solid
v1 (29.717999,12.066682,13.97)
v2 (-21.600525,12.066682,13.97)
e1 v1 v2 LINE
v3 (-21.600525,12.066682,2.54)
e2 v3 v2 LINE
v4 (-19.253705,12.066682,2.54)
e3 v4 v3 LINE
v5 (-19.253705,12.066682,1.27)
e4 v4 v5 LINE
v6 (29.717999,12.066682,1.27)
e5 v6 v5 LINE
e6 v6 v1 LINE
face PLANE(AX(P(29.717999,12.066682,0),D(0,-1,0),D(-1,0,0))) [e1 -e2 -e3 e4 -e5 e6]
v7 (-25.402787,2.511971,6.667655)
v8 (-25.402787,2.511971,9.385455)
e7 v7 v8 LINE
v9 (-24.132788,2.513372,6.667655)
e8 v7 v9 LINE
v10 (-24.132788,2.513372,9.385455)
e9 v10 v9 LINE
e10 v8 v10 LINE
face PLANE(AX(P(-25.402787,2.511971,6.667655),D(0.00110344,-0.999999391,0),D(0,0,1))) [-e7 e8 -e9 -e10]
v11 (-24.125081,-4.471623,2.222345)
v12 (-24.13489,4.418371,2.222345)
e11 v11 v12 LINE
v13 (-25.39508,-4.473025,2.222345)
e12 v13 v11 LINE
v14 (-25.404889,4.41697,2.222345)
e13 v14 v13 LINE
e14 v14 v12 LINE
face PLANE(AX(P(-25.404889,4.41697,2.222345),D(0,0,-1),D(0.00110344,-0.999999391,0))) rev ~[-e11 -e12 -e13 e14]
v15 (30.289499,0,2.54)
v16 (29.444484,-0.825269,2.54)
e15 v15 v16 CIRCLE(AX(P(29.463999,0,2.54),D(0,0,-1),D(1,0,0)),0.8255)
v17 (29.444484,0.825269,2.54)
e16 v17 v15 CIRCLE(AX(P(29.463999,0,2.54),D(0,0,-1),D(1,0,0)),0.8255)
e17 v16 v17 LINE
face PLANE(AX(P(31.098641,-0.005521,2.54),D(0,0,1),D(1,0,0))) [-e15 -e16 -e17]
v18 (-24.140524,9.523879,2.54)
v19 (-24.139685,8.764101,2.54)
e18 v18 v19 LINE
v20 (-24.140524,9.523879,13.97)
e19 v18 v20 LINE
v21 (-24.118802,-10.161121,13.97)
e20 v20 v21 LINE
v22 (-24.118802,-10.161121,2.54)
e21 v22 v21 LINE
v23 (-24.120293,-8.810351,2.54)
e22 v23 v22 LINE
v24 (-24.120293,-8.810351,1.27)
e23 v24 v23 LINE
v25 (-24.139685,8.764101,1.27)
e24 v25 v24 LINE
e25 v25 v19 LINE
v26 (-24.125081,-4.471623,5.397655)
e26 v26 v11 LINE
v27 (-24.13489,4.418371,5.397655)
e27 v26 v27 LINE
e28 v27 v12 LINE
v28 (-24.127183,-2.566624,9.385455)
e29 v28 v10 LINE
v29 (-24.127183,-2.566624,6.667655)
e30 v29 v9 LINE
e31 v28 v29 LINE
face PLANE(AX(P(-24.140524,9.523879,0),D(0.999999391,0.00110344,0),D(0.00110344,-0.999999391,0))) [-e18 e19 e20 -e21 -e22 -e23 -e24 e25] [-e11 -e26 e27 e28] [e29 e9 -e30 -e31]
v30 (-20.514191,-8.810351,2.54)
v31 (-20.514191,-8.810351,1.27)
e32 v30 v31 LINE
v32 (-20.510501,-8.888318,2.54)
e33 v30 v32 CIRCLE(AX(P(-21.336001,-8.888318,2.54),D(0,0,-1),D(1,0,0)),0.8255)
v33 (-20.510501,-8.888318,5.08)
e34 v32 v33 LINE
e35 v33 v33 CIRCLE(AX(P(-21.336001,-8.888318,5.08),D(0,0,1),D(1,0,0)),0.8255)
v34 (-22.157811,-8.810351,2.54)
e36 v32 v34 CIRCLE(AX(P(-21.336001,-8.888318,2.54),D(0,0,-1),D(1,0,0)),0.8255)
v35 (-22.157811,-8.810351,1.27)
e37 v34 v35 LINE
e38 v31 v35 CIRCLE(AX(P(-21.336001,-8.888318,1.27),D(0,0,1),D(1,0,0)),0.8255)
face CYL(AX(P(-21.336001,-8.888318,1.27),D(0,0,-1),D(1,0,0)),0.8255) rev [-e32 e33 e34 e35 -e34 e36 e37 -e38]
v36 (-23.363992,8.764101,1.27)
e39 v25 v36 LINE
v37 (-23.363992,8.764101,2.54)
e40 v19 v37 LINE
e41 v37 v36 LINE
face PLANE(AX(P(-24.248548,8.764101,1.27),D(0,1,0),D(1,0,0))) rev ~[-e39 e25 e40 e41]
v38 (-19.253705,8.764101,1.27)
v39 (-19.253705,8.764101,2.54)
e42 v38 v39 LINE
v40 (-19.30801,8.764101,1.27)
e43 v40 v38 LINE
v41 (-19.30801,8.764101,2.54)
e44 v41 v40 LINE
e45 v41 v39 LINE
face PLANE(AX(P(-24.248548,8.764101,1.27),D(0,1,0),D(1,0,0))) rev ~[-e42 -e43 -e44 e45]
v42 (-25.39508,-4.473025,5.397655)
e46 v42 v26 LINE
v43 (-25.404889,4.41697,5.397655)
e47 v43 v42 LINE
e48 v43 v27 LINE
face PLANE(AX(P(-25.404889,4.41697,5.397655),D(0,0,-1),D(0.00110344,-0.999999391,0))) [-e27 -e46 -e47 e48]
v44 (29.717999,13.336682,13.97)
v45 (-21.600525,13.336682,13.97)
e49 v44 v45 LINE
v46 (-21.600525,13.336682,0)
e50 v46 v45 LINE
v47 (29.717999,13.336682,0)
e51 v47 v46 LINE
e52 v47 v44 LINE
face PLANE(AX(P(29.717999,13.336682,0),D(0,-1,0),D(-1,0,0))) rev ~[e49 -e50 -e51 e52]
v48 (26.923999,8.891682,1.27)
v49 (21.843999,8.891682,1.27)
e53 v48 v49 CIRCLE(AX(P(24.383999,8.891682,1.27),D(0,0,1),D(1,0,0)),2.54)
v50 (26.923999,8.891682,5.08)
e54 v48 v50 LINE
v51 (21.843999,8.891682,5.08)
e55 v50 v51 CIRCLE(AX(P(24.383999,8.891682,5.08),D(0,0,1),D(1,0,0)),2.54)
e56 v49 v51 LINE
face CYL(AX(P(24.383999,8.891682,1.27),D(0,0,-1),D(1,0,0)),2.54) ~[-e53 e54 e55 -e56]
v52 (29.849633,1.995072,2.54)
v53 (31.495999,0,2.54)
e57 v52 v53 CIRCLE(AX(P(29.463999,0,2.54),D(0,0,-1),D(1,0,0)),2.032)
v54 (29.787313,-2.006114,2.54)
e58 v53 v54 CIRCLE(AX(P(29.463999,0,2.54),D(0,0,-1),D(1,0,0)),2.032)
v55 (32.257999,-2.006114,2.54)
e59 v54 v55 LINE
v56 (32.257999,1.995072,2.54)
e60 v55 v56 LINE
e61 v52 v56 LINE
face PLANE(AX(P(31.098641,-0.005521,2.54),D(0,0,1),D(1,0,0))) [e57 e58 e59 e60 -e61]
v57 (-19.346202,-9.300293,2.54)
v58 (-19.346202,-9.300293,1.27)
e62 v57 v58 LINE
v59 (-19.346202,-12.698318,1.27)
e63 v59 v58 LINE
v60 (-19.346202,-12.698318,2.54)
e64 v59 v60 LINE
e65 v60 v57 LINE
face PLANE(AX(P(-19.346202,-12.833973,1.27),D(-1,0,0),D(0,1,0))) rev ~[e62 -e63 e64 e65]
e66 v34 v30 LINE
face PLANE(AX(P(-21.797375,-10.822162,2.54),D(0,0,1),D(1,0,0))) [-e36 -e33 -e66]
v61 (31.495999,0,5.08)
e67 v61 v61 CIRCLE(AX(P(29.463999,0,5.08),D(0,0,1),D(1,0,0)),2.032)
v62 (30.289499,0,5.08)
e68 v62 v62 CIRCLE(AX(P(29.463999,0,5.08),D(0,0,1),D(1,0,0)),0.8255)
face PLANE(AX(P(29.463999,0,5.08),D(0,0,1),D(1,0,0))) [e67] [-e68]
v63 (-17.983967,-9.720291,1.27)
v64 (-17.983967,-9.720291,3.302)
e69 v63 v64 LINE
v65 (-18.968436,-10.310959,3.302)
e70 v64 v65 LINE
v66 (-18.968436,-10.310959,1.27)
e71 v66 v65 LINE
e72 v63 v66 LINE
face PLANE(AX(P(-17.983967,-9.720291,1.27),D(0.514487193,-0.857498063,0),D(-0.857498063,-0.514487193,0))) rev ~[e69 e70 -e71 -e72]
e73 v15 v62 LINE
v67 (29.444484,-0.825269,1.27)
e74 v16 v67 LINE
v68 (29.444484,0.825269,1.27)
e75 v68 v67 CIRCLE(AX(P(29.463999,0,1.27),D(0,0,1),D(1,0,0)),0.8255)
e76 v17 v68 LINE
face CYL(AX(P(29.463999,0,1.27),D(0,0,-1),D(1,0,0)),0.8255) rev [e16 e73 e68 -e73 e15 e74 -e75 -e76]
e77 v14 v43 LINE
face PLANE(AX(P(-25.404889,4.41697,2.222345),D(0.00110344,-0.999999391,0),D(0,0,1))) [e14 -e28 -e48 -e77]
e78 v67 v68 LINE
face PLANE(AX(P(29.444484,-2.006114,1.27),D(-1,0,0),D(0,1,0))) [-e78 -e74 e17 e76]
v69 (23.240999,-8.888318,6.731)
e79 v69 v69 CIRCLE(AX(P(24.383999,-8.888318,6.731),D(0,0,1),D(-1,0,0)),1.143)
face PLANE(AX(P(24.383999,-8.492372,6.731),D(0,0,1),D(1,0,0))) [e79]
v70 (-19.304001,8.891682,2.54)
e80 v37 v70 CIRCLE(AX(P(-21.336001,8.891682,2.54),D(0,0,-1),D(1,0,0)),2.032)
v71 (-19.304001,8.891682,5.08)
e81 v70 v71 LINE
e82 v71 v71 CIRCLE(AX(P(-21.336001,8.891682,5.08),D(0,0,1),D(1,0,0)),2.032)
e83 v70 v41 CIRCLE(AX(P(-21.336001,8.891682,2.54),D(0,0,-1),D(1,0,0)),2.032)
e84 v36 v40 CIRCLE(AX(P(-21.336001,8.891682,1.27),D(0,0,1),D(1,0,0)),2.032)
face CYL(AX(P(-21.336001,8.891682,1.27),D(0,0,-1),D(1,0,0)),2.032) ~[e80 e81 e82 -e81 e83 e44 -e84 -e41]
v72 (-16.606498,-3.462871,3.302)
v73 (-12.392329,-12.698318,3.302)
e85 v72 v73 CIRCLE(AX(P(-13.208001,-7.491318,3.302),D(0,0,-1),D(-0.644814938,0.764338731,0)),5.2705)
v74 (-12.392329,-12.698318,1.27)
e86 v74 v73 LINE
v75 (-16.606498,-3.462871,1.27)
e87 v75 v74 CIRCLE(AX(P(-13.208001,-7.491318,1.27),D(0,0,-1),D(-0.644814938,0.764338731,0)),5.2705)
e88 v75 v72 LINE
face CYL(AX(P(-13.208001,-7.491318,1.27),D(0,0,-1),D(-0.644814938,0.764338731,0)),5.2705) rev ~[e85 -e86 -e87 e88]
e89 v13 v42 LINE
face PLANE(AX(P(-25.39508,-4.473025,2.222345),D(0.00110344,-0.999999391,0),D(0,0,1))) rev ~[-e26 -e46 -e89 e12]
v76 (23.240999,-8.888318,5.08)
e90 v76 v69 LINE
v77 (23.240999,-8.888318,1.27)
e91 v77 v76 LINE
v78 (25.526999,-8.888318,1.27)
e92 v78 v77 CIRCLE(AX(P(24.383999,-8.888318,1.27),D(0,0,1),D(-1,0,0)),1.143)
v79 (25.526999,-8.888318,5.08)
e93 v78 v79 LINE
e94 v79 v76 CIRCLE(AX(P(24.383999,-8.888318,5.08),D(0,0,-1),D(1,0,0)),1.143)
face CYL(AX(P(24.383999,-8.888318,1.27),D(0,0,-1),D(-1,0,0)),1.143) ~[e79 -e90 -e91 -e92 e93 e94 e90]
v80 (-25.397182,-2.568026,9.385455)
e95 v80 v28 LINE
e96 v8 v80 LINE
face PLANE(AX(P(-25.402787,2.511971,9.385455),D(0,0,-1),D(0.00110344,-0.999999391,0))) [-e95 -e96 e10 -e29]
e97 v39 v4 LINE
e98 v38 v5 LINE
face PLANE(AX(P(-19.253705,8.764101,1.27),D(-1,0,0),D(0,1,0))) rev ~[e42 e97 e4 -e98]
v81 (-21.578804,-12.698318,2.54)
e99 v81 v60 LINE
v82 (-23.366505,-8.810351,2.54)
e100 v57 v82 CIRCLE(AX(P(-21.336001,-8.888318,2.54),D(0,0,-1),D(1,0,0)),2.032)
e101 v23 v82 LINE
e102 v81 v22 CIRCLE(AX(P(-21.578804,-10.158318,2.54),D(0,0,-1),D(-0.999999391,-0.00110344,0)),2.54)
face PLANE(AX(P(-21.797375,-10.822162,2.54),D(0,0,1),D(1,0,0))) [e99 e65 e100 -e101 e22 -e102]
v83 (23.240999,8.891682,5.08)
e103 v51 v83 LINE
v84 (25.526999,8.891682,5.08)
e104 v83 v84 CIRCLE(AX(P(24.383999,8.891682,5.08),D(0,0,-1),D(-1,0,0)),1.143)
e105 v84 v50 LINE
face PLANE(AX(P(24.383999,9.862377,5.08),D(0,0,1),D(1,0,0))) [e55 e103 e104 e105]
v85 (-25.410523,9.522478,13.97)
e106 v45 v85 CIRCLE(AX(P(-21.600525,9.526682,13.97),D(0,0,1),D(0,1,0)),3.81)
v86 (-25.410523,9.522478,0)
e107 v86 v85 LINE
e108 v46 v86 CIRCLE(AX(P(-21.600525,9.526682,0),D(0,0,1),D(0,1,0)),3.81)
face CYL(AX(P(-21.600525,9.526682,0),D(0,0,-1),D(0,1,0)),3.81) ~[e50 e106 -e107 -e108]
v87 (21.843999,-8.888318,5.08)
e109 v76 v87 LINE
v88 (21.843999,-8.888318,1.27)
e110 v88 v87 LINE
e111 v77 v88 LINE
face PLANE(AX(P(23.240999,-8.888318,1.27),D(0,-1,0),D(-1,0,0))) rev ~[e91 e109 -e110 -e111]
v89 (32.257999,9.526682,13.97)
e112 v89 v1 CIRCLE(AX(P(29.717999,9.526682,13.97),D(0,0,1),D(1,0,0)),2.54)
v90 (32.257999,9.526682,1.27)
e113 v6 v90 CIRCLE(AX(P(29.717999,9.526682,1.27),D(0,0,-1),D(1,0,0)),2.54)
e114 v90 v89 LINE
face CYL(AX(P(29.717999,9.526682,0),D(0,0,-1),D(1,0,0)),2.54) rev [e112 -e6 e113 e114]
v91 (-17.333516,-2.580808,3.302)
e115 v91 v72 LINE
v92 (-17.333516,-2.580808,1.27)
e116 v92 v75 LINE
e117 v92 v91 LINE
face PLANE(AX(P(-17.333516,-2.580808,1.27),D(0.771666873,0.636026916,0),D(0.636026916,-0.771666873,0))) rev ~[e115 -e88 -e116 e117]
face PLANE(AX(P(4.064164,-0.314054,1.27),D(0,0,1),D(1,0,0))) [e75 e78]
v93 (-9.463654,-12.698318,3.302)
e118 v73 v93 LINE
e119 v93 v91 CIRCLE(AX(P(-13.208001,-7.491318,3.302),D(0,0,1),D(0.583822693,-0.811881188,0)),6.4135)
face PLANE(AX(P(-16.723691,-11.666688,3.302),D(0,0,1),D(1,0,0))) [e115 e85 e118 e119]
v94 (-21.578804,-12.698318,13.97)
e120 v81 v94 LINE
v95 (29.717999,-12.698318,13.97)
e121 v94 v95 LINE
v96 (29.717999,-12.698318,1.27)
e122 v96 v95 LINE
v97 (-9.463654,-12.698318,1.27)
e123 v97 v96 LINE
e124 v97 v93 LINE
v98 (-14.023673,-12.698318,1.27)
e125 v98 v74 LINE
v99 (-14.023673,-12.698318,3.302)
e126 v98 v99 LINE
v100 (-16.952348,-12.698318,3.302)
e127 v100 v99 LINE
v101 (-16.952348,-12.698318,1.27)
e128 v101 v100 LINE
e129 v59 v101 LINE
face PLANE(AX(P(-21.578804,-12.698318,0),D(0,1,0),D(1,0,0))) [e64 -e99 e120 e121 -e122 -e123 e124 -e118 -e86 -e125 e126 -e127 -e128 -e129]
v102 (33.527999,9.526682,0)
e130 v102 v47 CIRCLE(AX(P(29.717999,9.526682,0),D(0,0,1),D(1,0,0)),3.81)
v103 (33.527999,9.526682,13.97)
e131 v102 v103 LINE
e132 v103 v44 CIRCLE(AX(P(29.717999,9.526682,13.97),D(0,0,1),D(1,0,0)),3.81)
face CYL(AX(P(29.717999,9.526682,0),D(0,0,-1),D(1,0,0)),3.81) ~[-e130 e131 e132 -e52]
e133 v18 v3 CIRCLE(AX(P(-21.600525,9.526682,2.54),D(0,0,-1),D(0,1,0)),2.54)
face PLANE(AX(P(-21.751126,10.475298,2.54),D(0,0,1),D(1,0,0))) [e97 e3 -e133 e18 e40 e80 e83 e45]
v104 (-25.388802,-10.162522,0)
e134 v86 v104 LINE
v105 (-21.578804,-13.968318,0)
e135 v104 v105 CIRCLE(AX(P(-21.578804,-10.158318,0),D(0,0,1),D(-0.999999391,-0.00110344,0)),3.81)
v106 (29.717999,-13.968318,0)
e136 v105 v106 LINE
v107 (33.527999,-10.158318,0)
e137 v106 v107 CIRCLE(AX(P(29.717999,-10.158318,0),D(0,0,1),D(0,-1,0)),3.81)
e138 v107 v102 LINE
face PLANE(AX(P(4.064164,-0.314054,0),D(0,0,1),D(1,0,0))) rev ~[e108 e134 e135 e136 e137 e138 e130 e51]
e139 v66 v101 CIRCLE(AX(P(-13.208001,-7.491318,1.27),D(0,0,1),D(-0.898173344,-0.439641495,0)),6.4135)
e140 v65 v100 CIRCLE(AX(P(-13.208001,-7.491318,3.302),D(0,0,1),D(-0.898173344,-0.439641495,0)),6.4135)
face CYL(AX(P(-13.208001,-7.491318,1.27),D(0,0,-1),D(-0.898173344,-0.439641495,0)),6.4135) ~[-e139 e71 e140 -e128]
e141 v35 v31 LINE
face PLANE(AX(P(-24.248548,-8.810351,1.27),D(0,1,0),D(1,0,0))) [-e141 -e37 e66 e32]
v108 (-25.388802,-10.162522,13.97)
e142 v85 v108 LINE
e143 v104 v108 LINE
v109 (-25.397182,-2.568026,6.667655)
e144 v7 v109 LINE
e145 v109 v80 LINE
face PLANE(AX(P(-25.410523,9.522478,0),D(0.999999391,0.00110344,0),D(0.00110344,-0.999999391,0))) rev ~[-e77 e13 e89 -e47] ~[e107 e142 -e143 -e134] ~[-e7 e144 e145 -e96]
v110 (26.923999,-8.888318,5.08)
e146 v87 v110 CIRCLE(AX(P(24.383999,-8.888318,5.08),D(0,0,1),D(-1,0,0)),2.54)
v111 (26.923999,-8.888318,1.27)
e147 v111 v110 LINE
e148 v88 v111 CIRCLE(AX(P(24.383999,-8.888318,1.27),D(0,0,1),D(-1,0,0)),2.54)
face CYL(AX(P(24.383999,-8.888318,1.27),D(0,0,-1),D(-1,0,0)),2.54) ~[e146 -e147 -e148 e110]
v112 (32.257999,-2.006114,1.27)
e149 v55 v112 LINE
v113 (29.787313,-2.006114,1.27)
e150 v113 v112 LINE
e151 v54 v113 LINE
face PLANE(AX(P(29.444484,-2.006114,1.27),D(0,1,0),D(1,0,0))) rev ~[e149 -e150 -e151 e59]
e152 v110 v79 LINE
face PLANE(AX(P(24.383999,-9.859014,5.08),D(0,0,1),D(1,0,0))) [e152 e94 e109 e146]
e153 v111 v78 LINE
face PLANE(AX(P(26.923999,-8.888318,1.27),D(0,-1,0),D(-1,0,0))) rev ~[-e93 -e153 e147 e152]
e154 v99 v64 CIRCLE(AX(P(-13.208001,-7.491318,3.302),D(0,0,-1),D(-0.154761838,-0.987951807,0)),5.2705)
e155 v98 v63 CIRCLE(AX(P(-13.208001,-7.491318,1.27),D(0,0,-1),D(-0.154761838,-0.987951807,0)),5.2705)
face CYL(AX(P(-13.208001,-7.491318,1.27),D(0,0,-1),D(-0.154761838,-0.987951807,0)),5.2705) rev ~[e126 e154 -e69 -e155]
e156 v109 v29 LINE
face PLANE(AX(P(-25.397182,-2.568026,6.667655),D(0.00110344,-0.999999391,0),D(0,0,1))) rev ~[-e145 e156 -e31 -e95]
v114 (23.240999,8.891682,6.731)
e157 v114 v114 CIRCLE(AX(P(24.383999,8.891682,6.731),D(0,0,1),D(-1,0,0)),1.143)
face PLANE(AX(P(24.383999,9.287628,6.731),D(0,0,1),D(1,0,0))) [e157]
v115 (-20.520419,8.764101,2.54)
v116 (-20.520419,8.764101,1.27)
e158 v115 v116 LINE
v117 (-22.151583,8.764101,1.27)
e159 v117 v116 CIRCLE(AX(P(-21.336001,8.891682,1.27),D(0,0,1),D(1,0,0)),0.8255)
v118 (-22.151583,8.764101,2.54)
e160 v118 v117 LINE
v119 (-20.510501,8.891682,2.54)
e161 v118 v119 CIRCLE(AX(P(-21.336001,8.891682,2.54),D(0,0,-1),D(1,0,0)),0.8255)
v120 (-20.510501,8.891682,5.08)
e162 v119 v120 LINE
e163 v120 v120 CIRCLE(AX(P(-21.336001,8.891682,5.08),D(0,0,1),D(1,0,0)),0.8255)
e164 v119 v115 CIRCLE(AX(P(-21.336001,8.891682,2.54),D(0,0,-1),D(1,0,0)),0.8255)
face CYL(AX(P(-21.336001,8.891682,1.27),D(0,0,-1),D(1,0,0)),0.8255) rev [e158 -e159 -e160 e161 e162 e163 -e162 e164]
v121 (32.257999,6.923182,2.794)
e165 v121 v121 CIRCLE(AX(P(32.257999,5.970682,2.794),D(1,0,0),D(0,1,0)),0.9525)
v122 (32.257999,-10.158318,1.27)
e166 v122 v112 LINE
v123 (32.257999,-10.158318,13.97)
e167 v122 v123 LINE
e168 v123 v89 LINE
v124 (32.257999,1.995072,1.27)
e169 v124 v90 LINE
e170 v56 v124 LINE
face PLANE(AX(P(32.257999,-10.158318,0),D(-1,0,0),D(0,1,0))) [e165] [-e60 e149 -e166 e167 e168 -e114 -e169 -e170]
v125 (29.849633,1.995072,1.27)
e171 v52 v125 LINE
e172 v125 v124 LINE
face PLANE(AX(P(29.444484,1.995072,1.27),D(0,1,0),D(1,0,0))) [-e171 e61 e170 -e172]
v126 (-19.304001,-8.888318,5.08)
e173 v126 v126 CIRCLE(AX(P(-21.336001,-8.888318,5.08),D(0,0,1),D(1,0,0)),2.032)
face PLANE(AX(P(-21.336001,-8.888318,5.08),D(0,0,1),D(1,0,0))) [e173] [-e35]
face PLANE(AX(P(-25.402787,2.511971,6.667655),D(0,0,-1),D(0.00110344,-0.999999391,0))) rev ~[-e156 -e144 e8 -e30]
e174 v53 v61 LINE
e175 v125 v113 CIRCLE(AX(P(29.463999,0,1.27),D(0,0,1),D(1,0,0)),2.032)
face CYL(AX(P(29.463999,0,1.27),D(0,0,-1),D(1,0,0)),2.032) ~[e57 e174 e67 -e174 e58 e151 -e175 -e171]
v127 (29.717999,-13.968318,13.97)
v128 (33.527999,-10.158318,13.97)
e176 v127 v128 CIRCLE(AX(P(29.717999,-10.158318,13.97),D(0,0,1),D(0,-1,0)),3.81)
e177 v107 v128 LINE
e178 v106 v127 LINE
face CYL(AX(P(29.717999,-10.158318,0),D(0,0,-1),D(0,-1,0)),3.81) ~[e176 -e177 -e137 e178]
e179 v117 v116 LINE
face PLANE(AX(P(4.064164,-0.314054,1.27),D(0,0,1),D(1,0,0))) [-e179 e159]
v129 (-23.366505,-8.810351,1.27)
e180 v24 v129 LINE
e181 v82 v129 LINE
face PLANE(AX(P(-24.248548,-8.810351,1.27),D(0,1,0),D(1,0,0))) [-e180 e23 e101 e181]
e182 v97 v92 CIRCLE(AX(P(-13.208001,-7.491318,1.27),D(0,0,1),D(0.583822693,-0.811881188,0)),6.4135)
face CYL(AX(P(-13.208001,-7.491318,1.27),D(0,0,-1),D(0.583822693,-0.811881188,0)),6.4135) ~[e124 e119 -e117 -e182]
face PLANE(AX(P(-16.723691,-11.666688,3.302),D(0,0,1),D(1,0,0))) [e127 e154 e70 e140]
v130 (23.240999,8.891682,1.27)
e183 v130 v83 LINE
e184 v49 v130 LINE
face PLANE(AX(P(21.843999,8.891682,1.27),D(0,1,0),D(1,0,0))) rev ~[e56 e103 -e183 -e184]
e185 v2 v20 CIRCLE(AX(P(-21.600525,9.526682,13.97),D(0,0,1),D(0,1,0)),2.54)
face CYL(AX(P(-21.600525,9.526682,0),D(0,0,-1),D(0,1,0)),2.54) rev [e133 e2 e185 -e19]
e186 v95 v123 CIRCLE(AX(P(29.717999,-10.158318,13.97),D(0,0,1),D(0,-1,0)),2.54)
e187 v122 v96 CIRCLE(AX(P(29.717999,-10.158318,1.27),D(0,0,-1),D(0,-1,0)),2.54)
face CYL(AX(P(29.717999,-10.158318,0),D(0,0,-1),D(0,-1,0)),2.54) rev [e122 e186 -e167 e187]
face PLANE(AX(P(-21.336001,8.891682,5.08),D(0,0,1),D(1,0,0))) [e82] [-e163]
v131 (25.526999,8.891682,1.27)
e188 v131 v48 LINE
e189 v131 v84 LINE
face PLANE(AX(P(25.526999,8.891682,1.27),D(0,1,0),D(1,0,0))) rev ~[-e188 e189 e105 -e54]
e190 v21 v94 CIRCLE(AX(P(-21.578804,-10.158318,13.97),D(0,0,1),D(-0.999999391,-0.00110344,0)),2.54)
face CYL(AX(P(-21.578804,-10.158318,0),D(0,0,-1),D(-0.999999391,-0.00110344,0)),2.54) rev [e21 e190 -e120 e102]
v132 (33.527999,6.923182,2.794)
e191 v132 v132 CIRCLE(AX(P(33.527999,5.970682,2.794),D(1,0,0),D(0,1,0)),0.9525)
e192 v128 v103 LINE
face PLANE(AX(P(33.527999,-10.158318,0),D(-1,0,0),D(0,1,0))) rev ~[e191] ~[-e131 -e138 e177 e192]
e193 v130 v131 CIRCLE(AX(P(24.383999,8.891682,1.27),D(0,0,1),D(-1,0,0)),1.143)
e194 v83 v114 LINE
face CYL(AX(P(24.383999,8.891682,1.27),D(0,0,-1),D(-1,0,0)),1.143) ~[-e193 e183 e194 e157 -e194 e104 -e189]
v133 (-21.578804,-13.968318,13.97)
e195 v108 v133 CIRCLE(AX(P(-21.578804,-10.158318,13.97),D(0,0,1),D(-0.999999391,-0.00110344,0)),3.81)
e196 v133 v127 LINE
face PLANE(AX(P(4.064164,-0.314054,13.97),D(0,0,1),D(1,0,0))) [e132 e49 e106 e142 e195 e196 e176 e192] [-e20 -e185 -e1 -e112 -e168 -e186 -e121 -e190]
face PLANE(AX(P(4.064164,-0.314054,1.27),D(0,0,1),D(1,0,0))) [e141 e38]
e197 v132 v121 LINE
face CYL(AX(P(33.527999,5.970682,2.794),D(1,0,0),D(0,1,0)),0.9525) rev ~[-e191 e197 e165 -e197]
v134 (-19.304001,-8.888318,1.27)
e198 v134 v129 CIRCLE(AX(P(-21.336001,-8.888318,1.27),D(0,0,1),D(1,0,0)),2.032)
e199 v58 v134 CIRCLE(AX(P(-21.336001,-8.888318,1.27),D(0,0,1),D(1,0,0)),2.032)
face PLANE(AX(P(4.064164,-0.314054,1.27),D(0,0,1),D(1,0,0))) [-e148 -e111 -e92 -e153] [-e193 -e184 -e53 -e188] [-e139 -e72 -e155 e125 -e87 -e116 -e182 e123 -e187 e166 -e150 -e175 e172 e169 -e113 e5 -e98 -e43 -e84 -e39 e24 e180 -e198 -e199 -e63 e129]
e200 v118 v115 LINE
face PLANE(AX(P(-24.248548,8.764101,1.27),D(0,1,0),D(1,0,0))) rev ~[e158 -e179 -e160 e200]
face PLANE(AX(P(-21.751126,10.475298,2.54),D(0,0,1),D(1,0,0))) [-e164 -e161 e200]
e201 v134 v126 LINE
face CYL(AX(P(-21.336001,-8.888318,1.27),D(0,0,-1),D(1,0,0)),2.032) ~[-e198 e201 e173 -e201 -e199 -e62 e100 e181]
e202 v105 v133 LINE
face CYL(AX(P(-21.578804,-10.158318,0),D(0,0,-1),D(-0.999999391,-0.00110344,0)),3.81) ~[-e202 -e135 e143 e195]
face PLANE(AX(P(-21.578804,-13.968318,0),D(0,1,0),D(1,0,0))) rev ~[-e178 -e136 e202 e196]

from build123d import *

# Parameters (mm, degrees)
F1_DEPTH  = 13.97
F2_T      = -1.27
F3_R      = 2.032
F3_R_2    = 0.8255
F4_DEPTH  = 3.81
F5_DEPTH  = 5.461
F6_DEPTH  = 2.54
F7_W      = 8.89
F7_H      = 3.1753103511
F7_W_2    = 5.08
F7_H_2    = 2.7178
F8_DEPTH  = 1.905
F9_R      = 0.9525
F10_DEPTH = 1.905
F11_R     = 2.032
F11_R_2   = 0.8255
F12_DEPTH = 3.81
F14_DEPTH = 2.032
F15_W     = 3.3083129674
F15_H     = 4.001185298
F15_W_2   = 4.9948431551
F15_H_2   = 3.4223934636
F15_W_3   = 4.9023460597
F15_H_3   = 4.0236227214
F16_DEPTH = 1.27


with BuildPart() as f1:
    # F0 (on Top) → F1 (new body)
    with BuildSketch(Plane.XY):
        with BuildLine():
            Line((-21.5788040441, -13.9683183577), (29.7179990722, -13.9683183577))
            ThreePointArc((29.7179990722, -13.9683183577), (32.4120759085, -12.852395194), (33.5279990722, -10.1583183577))
            Line((33.5279990722, -10.1583183577), (33.5279990722, 9.5266816423))
            ThreePointArc((33.5279990722, 9.5266816423), (32.4120759085, 12.2207584786), (29.7179990722, 13.3366816423))
            Line((29.7179990722, 13.3366816423), (-21.60052527, 13.3366816423))
            ThreePointArc((-21.60052527, 13.3366816423), (-24.2960880723, 12.2192716925), (-25.4105229505, 9.5224775366))
            Line((-25.4105229505, 9.5224775366), (-25.3888017246, -10.1625224634))
            ThreePointArc((-25.3888017246, -10.1625224634), (-24.2713940943, -12.8538811601), (-21.5788040441, -13.9683183577))
        make_face()
    extrude(amount=F1_DEPTH)

    # F2
    f2_openings = [f1.faces().sort_by_distance(p)[0] for p in [
        (4.064166, -0.31477, 13.97),
    ]]
    offset(amount=F2_T, openings=f2_openings)

    # F3 (on face) → F4 (join)
    with BuildSketch(Plane.XY.offset(1.27)):
        with Locations((-21.3360009278, 8.8916816423)):
            Circle(F3_R)
        with Locations((-21.3360009278, 8.8916816423)):
            Circle(F3_R_2, mode=Mode.SUBTRACT)
        with Locations((-21.3360009278, -8.8883183577)):
            Circle(F3_R)
        with Locations((-21.3360009278, -8.8883183577)):
            Circle(F3_R_2, mode=Mode.SUBTRACT)
        with BuildLine():
            Line((26.9239990722, -8.8883183577), (25.5269990722, -8.8883183577))
            ThreePointArc((25.5269990722, -8.8883183577), (24.3839990722, -10.0313183577), (23.2409990722, -8.8883183577))
            Line((23.2409990722, -8.8883183577), (21.8439990722, -8.8883183577))
            ThreePointArc((21.8439990722, -8.8883183577), (24.3839990722, -11.4283183577), (26.9239990722, -8.8883183577))
        make_face()
        with BuildLine():
            ThreePointArc((23.2409990722, 8.8916816423), (24.3839990722, 10.0346816423), (25.5269990722, 8.8916816423))
            Line((25.5269990722, 8.8916816423), (26.9239990722, 8.8916816423))
            ThreePointArc((26.9239990722, 8.8916816423), (24.3839990722, 11.4316816423), (21.8439990722, 8.8916816423))
            Line((21.8439990722, 8.8916816423), (23.2409990722, 8.8916816423))
        make_face()
    extrude(amount=F4_DEPTH)

    # F3 (on face) → F5 (join)
    with BuildSketch(Plane.XY.offset(1.27)):
        with BuildLine():
            Line((24.3839990722, 8.8916816423), (25.5269990722, 8.8916816423))
            ThreePointArc((25.5269990722, 8.8916816423), (24.3839990722, 10.0346816423), (23.2409990722, 8.8916816423))
            Line((23.2409990722, 8.8916816423), (24.3839990722, 8.8916816423))
        make_face()
        with BuildLine():
            ThreePointArc((23.2409990722, 8.8916816423), (24.3839990722, 7.7486816423), (25.5269990722, 8.8916816423))
            Line((25.5269990722, 8.8916816423), (24.3839990722, 8.8916816423))
            Line((24.3839990722, 8.8916816423), (23.2409990722, 8.8916816423))
        make_face()
        with BuildLine():
            Line((24.3839990722, -8.8883183577), (25.5269990722, -8.8883183577))
            ThreePointArc((25.5269990722, -8.8883183577), (24.3839990722, -7.7453183577), (23.2409990722, -8.8883183577))
            Line((23.2409990722, -8.8883183577), (24.3839990722, -8.8883183577))
        make_face()
        with BuildLine():
            ThreePointArc((23.2409990722, -8.8883183577), (24.3839990722, -10.0313183577), (25.5269990722, -8.8883183577))
            Line((25.5269990722, -8.8883183577), (24.3839990722, -8.8883183577))
            Line((24.3839990722, -8.8883183577), (23.2409990722, -8.8883183577))
        make_face()
    extrude(amount=F5_DEPTH)

    # F3 (on face) → F6 (cut)
    with BuildSketch(Plane.XY.offset(1.27)):
        with Locations((-21.3360009278, 8.8916816423)):
            Circle(F3_R_2)
        with Locations((-21.3360009278, -8.8883183577)):
            Circle(F3_R_2)
    extrude(amount=F6_DEPTH, mode=Mode.SUBTRACT)

    # F7 (on face) → F8 (cut)
    with BuildSketch(Plane(origin=(-25.3999845367, -0.0280273712, 0), x_dir=(0.0011034398, -0.9999993912, 0), z_dir=(-0.9999993912, -0.0011034398, 0))):
        with Locations((0, 3.81)):
            Rectangle(F7_W, F7_H)
        with Locations((0, 8.0265551756)):
            Rectangle(F7_W_2, F7_H_2)
    extrude(amount=-F8_DEPTH, mode=Mode.SUBTRACT)

    # F9 (on face) → F10 (cut)
    with BuildSketch(Plane.YZ.offset(33.5279990722)):
        with Locations((5.9706816423, 2.794)):
            Circle(F9_R)
    extrude(amount=-F10_DEPTH, mode=Mode.SUBTRACT)

    # F11 (on face) → F12 (join)
    with BuildSketch(Plane.XY.offset(1.27)):
        with Locations((29.4639990722, 0)):
            Circle(F11_R)
        with Locations((29.4639990722, 0)):
            Circle(F11_R_2, mode=Mode.SUBTRACT)
    extrude(amount=F12_DEPTH)

    # F13 (on face) → F14 (join)
    with BuildSketch(Plane.XY.offset(1.27)):
        with BuildLine():
            ThreePointArc((-14.0236731965, -12.6983183577), (-16.3756129487, -11.7037291087), (-17.9839668508, -9.7202911598))
            Line((-17.9839668508, -9.7202911598), (-18.9684356708, -10.3109590834))
            ThreePointArc((-18.9684356708, -10.3109590834), (-18.1080100407, -11.6293001054), (-16.9523477667, -12.6983183577))
            Line((-16.9523477667, -12.6983183577), (-14.0236731965, -12.6983183577))
        make_face()
        with BuildLine():
            ThreePointArc((-12.3923286591, -12.6983183577), (-13.2080009278, -12.7618183577), (-14.0236731965, -12.6983183577))
            Line((-14.0236731965, -12.6983183577), (-16.9523477667, -12.6983183577))
            ThreePointArc((-16.9523477667, -12.6983183577), (-13.2080009278, -13.9048183577), (-9.4636540889, -12.6983183577))
            Line((-9.4636540889, -12.6983183577), (-12.3923286591, -12.6983183577))
        make_face()
        with BuildLine():
            ThreePointArc((-16.6064980594, -3.4628710766), (-8.4130955389, -5.303384958), (-12.3923286591, -12.6983183577))
            Line((-12.3923286591, -12.6983183577), (-9.4636540889, -12.6983183577))
            ThreePointArc((-9.4636540889, -12.6983183577), (-8.145657173, -3.5535959249), (-17.3335159362, -2.5808083877))
            Line((-17.3335159362, -2.5808083877), (-16.6064980594, -3.4628710766))
        make_face()
    extrude(amount=F14_DEPTH)

    # F15 (on face) → F16 (join)
    with BuildSketch(Plane.XY.offset(1.27)):
        with Locations((31.0986405239, -0.0055211131)):
            Rectangle(F15_W, F15_H)
        with Locations((-21.7511262745, 10.4752979241)):
            Rectangle(F15_W_2, F15_H_2)
        with Locations((-21.7973748222, -10.8221620321)):
            Rectangle(F15_W_3, F15_H_3)
    extrude(amount=F16_DEPTH)


solid = f1.part
